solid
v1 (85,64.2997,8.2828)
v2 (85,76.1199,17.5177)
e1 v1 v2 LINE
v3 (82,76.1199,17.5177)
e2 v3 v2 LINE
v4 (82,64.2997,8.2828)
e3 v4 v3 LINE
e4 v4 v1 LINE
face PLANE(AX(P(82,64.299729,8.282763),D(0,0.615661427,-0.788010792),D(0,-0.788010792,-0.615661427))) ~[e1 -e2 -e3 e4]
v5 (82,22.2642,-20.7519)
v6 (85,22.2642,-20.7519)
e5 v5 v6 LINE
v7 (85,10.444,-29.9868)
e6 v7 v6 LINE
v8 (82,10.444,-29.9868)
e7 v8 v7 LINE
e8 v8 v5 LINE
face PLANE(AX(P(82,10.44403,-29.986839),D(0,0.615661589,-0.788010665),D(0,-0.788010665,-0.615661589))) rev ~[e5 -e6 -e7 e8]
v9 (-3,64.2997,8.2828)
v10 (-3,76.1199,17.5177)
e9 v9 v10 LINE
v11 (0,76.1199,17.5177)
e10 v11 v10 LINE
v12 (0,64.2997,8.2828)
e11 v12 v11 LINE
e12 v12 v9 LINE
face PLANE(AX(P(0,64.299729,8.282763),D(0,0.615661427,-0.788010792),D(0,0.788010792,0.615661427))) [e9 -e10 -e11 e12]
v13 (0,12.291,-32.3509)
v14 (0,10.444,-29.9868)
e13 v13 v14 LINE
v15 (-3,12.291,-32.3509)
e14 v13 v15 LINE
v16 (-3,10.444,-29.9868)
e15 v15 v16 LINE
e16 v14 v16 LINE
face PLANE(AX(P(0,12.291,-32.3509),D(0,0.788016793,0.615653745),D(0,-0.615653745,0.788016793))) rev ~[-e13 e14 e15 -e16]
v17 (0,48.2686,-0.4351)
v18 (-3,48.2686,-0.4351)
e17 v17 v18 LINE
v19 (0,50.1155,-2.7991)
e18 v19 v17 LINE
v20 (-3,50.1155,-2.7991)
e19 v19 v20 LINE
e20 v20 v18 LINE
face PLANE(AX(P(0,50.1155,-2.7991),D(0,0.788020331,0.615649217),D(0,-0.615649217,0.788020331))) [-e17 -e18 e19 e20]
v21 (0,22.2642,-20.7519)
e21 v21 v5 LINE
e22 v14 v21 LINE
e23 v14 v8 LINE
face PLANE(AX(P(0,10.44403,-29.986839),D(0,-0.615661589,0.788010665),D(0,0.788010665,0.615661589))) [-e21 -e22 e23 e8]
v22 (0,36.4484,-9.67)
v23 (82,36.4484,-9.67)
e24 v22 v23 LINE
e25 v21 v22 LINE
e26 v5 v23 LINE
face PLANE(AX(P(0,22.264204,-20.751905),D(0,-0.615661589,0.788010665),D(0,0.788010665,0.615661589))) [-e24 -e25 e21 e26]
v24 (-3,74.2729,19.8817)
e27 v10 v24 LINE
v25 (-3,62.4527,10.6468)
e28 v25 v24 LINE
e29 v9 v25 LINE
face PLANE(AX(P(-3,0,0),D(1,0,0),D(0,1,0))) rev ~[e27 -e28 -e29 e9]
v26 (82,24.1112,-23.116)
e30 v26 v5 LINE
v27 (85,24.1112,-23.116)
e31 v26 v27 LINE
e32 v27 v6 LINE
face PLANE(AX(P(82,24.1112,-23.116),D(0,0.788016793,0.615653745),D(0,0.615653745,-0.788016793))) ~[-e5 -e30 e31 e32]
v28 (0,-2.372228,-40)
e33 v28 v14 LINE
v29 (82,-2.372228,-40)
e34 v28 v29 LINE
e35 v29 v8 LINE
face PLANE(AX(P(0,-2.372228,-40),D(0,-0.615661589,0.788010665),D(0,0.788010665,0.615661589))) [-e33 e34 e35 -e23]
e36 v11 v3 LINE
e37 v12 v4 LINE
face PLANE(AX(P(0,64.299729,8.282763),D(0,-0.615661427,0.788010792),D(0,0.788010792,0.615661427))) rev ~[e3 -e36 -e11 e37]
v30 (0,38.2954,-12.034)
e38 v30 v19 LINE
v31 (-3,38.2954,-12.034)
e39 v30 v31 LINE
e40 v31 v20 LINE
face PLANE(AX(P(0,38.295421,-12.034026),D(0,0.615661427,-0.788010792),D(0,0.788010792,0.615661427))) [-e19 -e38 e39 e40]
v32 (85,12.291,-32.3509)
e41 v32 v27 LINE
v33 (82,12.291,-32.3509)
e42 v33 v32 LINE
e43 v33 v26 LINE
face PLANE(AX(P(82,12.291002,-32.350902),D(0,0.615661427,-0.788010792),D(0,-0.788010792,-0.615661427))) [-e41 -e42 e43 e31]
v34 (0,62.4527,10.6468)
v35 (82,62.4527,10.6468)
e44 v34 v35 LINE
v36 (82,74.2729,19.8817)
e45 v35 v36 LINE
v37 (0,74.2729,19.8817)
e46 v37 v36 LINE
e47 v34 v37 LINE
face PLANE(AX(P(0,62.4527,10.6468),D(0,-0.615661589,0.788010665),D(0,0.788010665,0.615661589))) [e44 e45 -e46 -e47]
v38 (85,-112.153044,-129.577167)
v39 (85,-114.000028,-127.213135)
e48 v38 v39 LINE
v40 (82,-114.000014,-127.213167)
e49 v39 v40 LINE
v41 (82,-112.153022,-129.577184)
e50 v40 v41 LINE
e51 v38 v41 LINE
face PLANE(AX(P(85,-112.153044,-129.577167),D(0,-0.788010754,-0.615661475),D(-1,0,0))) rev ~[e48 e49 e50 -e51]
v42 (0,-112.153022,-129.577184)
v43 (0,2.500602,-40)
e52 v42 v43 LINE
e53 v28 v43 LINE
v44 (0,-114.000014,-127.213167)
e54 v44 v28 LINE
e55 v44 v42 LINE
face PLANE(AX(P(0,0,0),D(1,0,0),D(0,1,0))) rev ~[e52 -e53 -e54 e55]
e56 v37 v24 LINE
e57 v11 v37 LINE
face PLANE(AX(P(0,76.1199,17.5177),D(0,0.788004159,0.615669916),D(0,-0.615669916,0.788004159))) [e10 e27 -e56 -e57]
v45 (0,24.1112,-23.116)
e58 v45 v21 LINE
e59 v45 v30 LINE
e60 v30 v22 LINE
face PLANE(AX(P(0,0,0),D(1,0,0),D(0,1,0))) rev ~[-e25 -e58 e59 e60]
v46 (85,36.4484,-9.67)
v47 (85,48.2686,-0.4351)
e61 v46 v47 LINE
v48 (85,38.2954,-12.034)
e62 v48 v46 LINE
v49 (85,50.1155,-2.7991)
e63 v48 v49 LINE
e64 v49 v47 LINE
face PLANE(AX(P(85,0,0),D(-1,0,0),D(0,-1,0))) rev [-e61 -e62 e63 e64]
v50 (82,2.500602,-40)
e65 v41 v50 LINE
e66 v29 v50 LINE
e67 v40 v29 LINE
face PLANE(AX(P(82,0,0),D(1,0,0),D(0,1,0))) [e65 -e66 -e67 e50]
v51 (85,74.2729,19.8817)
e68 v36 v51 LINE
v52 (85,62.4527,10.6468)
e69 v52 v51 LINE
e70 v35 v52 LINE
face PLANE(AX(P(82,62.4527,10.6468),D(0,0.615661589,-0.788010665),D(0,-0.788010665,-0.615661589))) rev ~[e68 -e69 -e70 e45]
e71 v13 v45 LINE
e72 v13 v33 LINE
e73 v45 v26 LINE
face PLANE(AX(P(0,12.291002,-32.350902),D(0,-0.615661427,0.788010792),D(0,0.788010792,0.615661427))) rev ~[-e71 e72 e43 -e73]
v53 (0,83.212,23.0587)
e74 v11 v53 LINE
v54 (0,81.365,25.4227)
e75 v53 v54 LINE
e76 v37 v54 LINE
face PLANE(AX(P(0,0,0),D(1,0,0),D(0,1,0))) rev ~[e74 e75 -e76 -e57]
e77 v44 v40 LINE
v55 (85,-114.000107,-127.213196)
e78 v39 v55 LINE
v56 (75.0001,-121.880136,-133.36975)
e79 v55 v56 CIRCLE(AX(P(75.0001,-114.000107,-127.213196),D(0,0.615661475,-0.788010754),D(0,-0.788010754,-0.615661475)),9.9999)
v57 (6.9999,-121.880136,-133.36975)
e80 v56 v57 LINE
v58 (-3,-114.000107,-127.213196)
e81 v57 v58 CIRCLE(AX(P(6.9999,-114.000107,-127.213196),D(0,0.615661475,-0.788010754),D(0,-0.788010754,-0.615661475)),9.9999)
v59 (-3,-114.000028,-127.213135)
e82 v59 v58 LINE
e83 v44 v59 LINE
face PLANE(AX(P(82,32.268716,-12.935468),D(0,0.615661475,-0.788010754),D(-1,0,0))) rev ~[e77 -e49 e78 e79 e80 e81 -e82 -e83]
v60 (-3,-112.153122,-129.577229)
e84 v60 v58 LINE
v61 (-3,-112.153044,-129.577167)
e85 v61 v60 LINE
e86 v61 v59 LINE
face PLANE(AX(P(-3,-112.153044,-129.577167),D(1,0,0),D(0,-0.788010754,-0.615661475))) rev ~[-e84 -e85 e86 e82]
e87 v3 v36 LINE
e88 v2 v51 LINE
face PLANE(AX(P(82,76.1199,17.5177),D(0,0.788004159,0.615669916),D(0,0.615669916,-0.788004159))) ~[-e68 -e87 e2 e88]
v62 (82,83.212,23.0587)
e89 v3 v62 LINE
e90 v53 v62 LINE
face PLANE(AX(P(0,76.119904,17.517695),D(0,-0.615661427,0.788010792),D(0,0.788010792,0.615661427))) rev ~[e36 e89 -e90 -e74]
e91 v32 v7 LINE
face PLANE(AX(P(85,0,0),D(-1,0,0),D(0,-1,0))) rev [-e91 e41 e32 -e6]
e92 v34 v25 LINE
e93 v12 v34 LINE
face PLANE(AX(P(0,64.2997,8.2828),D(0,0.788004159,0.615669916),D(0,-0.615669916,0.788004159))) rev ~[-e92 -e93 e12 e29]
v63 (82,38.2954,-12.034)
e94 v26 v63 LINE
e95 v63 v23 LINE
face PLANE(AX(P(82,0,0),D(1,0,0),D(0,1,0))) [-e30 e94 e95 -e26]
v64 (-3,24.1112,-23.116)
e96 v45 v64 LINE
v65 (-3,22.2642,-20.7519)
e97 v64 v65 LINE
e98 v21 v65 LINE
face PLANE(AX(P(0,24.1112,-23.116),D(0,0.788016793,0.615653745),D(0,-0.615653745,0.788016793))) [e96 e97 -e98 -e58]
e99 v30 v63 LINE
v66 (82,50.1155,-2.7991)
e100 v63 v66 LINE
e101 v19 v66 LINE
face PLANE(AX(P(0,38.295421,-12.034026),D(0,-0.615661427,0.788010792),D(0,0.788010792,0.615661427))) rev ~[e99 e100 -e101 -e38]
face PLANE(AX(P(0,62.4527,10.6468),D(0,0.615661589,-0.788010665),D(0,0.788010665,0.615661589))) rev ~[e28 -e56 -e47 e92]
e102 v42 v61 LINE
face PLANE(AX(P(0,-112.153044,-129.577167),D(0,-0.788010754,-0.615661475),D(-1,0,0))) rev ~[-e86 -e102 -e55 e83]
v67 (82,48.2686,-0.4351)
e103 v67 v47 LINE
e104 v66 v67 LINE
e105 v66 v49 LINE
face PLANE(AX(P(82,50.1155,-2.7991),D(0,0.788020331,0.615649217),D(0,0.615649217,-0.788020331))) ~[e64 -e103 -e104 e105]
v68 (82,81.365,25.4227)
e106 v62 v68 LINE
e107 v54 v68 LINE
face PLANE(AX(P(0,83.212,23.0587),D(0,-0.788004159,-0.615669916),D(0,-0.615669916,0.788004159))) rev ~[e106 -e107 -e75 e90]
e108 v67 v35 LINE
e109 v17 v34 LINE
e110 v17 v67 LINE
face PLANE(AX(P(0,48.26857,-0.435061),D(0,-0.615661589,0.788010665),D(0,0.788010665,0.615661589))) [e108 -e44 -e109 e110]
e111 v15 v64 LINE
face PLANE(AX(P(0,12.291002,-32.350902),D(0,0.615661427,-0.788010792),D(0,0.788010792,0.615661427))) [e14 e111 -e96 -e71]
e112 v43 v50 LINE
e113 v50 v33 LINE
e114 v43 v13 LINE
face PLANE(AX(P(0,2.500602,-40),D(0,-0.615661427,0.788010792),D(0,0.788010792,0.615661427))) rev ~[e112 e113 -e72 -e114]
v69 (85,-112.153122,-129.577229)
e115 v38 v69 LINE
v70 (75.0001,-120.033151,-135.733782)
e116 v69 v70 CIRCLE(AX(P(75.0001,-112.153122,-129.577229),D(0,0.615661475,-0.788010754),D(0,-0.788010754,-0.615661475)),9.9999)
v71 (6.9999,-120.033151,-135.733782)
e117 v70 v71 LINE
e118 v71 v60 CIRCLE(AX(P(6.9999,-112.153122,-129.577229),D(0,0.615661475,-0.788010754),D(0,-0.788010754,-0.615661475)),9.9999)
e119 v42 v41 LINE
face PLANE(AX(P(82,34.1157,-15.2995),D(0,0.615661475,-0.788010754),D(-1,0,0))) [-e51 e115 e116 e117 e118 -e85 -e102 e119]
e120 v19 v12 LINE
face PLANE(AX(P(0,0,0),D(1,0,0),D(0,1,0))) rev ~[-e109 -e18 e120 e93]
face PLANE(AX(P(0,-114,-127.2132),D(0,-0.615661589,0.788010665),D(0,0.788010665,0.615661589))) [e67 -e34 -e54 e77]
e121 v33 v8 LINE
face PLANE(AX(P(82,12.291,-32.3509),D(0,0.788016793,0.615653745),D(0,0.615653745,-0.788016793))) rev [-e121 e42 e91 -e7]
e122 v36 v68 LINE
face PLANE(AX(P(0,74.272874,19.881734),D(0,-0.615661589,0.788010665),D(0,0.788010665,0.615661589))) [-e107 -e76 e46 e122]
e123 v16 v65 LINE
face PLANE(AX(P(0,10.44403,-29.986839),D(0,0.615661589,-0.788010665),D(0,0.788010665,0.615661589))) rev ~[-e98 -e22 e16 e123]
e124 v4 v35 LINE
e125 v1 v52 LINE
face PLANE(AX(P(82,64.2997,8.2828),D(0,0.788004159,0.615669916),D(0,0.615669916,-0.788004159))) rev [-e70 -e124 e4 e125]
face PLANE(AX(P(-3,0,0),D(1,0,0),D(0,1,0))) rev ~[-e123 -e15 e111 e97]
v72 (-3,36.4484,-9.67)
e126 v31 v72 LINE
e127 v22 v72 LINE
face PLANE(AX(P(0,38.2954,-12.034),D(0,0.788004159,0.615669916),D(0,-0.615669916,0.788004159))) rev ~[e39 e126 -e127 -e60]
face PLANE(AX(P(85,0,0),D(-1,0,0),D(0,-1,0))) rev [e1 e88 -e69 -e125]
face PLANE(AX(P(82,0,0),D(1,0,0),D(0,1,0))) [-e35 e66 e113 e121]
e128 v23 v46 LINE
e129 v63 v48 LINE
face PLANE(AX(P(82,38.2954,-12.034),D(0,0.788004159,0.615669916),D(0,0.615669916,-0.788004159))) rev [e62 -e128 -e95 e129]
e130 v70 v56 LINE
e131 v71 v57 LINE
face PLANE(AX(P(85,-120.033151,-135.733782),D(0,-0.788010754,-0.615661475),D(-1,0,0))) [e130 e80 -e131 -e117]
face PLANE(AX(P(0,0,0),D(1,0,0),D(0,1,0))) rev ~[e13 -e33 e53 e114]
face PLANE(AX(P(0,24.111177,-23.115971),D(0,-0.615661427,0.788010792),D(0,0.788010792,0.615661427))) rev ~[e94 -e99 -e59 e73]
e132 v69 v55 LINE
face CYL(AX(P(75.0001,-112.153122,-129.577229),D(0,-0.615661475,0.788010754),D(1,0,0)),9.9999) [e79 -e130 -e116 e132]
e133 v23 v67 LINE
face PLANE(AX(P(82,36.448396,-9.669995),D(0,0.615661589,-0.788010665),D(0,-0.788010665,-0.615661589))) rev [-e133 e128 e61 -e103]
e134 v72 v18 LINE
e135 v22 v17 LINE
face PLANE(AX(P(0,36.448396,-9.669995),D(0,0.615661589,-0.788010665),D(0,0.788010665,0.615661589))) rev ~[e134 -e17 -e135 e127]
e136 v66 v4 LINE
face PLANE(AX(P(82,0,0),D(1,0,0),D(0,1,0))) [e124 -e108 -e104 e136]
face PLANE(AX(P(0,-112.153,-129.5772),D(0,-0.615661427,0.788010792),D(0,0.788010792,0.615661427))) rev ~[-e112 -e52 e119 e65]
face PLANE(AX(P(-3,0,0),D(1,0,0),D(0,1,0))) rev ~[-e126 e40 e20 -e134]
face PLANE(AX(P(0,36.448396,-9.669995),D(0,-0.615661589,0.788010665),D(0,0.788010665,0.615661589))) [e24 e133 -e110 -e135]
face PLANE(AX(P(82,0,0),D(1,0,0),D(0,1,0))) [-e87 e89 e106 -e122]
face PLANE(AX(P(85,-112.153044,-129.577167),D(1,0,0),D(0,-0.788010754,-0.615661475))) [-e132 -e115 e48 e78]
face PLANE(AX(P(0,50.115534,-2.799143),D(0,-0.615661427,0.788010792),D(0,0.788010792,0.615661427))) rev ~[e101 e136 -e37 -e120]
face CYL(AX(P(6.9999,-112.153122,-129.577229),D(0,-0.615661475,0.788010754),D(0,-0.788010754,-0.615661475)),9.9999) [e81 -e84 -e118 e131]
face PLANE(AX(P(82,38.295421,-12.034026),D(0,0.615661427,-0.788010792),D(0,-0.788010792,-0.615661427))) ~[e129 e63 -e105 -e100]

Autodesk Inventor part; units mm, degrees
ref_plane "YZ Plane" through (0, 0, 0) normal (1, 0, 0) x (0, 1, 0)
ref_plane "XZ Plane" through (0, 0, 0) normal (0, 1, 0) x (-1, 0, 0)
sketch "Sketch2" plane through (0, 0, 0) normal (1, 0, 0) x (0, 1, 0)
  line L0 (-114, -127.2132) -> (-112.153, -129.5772)
  line L1 (-112.153, -129.5772) -> (84, 23.6743)
  line L2 (-114, -127.2132) -> (-114, -57.4172)
  line L3 (-114, -57.4172) -> (-84, -33.9786)
  circle A0 centre (0, 5) radius 17.5
  circle A1 centre (0, 5) radius 31
  line L4 (-114, -127.2132) -> (84, 27.4814)
  line L5 (84, -40) -> (84, 40)
  line L6 (-84, -40) -> (84, -40)
  line L7 (76.1199, 17.5177) -> (74.2729, 19.8817)
  line L8 (64.2997, 8.2828) -> (62.4527, 10.6468)
  line L9 (-84, 40) -> (-84, -40)
  line L10 (84, 40) -> (-84, 40)
  line L11 (38.2954, -12.034) -> (36.4484, -9.67)
  line L12 (50.1155, -2.7991) -> (48.2686, -0.4351)
  line L13 (12.291, -32.3509) -> (10.444, -29.9868)
  line L14 (24.1112, -23.116) -> (22.2642, -20.7519)
  line L15 (83.212, 23.0587) -> (81.365, 25.4227)
  point P0 (0, 0)
  dimension "d49" = 3
  dimension "d37" = 62
  dimension "d38" = 35
  dimension "d39" = 142
  dimension "d40" = 168
  dimension "d41" = 198
  dimension "d42" = 15
  dimension "d43" = 33
  dimension "d44" = 48
  dimension "d45" = 66
  dimension "d46" = 81
  dimension "d47" = 238.9218
  dimension "d48" = 80
  dimension "d50" = 58
  dimension "d51" = 84
  dimension "d52" = 70.7683
  dimension "d53" = 40
  dimension "d54" = 84
  dimension "d55" = 67.69
  dimension "d56" = 1
extrude "Extrusion1" add sketch "Sketch2" along normal blind 82 contours L4 L6 L1 L0 | L4 L13 L1 L6 | L4 L14 L1 L13 | L4 L11 L1 L14 | L4 L12 L1 L11 | L1 L7 L4 L15 | L4 L8 L1 L12 | L1 L8 L4 L7
extrude "Extrusion2" add sketch "Sketch2" against normal blind 3 contours L4 L14 L1 L13 | L4 L12 L1 L11 | L1 L8 L4 L7
ref_plane "Work Plane1" through (41, 0, 0) normal (-1, 0, 0) x (0, 0, 1)
mirror "Mirror1" about plane through (41, 0, 0) normal (-1, 0, 0) of "Extrusion2"
sketch "Sketch3" plane through (82, 34.1157, -15.2995) normal (0, 0.6156615, -0.7880108) x (-1, 0, 0)
  line L0 (-3, -195.6177) -> (85, -195.6177)
  line L1 (-3, -185.6177) -> (-3, -195.6177)
  line L2 (85, -185.6177) -> (85, -195.6177)
  line L3 (82, -185.6177) -> (82, -27.696) projected
  line L4 (0, -185.6177) -> (0, -27.696) projected
  line L5 (82, -185.6177) -> (0, -185.6177) projected
  line L6 (-3, -185.6177) -> (85, -185.6177)
  dimension "d57" = 10
  dimension "d58" = 3
  dimension "d59" = 3
extrude "Extrusion3" add sketch "Sketch3" against normal up to surface (3 mm away)
fillet "Fillet1" radius 10 2 edges at (85, -120.9566, -134.5518) (-3, -120.9566, -134.5518)
properties part number "Rampa"
